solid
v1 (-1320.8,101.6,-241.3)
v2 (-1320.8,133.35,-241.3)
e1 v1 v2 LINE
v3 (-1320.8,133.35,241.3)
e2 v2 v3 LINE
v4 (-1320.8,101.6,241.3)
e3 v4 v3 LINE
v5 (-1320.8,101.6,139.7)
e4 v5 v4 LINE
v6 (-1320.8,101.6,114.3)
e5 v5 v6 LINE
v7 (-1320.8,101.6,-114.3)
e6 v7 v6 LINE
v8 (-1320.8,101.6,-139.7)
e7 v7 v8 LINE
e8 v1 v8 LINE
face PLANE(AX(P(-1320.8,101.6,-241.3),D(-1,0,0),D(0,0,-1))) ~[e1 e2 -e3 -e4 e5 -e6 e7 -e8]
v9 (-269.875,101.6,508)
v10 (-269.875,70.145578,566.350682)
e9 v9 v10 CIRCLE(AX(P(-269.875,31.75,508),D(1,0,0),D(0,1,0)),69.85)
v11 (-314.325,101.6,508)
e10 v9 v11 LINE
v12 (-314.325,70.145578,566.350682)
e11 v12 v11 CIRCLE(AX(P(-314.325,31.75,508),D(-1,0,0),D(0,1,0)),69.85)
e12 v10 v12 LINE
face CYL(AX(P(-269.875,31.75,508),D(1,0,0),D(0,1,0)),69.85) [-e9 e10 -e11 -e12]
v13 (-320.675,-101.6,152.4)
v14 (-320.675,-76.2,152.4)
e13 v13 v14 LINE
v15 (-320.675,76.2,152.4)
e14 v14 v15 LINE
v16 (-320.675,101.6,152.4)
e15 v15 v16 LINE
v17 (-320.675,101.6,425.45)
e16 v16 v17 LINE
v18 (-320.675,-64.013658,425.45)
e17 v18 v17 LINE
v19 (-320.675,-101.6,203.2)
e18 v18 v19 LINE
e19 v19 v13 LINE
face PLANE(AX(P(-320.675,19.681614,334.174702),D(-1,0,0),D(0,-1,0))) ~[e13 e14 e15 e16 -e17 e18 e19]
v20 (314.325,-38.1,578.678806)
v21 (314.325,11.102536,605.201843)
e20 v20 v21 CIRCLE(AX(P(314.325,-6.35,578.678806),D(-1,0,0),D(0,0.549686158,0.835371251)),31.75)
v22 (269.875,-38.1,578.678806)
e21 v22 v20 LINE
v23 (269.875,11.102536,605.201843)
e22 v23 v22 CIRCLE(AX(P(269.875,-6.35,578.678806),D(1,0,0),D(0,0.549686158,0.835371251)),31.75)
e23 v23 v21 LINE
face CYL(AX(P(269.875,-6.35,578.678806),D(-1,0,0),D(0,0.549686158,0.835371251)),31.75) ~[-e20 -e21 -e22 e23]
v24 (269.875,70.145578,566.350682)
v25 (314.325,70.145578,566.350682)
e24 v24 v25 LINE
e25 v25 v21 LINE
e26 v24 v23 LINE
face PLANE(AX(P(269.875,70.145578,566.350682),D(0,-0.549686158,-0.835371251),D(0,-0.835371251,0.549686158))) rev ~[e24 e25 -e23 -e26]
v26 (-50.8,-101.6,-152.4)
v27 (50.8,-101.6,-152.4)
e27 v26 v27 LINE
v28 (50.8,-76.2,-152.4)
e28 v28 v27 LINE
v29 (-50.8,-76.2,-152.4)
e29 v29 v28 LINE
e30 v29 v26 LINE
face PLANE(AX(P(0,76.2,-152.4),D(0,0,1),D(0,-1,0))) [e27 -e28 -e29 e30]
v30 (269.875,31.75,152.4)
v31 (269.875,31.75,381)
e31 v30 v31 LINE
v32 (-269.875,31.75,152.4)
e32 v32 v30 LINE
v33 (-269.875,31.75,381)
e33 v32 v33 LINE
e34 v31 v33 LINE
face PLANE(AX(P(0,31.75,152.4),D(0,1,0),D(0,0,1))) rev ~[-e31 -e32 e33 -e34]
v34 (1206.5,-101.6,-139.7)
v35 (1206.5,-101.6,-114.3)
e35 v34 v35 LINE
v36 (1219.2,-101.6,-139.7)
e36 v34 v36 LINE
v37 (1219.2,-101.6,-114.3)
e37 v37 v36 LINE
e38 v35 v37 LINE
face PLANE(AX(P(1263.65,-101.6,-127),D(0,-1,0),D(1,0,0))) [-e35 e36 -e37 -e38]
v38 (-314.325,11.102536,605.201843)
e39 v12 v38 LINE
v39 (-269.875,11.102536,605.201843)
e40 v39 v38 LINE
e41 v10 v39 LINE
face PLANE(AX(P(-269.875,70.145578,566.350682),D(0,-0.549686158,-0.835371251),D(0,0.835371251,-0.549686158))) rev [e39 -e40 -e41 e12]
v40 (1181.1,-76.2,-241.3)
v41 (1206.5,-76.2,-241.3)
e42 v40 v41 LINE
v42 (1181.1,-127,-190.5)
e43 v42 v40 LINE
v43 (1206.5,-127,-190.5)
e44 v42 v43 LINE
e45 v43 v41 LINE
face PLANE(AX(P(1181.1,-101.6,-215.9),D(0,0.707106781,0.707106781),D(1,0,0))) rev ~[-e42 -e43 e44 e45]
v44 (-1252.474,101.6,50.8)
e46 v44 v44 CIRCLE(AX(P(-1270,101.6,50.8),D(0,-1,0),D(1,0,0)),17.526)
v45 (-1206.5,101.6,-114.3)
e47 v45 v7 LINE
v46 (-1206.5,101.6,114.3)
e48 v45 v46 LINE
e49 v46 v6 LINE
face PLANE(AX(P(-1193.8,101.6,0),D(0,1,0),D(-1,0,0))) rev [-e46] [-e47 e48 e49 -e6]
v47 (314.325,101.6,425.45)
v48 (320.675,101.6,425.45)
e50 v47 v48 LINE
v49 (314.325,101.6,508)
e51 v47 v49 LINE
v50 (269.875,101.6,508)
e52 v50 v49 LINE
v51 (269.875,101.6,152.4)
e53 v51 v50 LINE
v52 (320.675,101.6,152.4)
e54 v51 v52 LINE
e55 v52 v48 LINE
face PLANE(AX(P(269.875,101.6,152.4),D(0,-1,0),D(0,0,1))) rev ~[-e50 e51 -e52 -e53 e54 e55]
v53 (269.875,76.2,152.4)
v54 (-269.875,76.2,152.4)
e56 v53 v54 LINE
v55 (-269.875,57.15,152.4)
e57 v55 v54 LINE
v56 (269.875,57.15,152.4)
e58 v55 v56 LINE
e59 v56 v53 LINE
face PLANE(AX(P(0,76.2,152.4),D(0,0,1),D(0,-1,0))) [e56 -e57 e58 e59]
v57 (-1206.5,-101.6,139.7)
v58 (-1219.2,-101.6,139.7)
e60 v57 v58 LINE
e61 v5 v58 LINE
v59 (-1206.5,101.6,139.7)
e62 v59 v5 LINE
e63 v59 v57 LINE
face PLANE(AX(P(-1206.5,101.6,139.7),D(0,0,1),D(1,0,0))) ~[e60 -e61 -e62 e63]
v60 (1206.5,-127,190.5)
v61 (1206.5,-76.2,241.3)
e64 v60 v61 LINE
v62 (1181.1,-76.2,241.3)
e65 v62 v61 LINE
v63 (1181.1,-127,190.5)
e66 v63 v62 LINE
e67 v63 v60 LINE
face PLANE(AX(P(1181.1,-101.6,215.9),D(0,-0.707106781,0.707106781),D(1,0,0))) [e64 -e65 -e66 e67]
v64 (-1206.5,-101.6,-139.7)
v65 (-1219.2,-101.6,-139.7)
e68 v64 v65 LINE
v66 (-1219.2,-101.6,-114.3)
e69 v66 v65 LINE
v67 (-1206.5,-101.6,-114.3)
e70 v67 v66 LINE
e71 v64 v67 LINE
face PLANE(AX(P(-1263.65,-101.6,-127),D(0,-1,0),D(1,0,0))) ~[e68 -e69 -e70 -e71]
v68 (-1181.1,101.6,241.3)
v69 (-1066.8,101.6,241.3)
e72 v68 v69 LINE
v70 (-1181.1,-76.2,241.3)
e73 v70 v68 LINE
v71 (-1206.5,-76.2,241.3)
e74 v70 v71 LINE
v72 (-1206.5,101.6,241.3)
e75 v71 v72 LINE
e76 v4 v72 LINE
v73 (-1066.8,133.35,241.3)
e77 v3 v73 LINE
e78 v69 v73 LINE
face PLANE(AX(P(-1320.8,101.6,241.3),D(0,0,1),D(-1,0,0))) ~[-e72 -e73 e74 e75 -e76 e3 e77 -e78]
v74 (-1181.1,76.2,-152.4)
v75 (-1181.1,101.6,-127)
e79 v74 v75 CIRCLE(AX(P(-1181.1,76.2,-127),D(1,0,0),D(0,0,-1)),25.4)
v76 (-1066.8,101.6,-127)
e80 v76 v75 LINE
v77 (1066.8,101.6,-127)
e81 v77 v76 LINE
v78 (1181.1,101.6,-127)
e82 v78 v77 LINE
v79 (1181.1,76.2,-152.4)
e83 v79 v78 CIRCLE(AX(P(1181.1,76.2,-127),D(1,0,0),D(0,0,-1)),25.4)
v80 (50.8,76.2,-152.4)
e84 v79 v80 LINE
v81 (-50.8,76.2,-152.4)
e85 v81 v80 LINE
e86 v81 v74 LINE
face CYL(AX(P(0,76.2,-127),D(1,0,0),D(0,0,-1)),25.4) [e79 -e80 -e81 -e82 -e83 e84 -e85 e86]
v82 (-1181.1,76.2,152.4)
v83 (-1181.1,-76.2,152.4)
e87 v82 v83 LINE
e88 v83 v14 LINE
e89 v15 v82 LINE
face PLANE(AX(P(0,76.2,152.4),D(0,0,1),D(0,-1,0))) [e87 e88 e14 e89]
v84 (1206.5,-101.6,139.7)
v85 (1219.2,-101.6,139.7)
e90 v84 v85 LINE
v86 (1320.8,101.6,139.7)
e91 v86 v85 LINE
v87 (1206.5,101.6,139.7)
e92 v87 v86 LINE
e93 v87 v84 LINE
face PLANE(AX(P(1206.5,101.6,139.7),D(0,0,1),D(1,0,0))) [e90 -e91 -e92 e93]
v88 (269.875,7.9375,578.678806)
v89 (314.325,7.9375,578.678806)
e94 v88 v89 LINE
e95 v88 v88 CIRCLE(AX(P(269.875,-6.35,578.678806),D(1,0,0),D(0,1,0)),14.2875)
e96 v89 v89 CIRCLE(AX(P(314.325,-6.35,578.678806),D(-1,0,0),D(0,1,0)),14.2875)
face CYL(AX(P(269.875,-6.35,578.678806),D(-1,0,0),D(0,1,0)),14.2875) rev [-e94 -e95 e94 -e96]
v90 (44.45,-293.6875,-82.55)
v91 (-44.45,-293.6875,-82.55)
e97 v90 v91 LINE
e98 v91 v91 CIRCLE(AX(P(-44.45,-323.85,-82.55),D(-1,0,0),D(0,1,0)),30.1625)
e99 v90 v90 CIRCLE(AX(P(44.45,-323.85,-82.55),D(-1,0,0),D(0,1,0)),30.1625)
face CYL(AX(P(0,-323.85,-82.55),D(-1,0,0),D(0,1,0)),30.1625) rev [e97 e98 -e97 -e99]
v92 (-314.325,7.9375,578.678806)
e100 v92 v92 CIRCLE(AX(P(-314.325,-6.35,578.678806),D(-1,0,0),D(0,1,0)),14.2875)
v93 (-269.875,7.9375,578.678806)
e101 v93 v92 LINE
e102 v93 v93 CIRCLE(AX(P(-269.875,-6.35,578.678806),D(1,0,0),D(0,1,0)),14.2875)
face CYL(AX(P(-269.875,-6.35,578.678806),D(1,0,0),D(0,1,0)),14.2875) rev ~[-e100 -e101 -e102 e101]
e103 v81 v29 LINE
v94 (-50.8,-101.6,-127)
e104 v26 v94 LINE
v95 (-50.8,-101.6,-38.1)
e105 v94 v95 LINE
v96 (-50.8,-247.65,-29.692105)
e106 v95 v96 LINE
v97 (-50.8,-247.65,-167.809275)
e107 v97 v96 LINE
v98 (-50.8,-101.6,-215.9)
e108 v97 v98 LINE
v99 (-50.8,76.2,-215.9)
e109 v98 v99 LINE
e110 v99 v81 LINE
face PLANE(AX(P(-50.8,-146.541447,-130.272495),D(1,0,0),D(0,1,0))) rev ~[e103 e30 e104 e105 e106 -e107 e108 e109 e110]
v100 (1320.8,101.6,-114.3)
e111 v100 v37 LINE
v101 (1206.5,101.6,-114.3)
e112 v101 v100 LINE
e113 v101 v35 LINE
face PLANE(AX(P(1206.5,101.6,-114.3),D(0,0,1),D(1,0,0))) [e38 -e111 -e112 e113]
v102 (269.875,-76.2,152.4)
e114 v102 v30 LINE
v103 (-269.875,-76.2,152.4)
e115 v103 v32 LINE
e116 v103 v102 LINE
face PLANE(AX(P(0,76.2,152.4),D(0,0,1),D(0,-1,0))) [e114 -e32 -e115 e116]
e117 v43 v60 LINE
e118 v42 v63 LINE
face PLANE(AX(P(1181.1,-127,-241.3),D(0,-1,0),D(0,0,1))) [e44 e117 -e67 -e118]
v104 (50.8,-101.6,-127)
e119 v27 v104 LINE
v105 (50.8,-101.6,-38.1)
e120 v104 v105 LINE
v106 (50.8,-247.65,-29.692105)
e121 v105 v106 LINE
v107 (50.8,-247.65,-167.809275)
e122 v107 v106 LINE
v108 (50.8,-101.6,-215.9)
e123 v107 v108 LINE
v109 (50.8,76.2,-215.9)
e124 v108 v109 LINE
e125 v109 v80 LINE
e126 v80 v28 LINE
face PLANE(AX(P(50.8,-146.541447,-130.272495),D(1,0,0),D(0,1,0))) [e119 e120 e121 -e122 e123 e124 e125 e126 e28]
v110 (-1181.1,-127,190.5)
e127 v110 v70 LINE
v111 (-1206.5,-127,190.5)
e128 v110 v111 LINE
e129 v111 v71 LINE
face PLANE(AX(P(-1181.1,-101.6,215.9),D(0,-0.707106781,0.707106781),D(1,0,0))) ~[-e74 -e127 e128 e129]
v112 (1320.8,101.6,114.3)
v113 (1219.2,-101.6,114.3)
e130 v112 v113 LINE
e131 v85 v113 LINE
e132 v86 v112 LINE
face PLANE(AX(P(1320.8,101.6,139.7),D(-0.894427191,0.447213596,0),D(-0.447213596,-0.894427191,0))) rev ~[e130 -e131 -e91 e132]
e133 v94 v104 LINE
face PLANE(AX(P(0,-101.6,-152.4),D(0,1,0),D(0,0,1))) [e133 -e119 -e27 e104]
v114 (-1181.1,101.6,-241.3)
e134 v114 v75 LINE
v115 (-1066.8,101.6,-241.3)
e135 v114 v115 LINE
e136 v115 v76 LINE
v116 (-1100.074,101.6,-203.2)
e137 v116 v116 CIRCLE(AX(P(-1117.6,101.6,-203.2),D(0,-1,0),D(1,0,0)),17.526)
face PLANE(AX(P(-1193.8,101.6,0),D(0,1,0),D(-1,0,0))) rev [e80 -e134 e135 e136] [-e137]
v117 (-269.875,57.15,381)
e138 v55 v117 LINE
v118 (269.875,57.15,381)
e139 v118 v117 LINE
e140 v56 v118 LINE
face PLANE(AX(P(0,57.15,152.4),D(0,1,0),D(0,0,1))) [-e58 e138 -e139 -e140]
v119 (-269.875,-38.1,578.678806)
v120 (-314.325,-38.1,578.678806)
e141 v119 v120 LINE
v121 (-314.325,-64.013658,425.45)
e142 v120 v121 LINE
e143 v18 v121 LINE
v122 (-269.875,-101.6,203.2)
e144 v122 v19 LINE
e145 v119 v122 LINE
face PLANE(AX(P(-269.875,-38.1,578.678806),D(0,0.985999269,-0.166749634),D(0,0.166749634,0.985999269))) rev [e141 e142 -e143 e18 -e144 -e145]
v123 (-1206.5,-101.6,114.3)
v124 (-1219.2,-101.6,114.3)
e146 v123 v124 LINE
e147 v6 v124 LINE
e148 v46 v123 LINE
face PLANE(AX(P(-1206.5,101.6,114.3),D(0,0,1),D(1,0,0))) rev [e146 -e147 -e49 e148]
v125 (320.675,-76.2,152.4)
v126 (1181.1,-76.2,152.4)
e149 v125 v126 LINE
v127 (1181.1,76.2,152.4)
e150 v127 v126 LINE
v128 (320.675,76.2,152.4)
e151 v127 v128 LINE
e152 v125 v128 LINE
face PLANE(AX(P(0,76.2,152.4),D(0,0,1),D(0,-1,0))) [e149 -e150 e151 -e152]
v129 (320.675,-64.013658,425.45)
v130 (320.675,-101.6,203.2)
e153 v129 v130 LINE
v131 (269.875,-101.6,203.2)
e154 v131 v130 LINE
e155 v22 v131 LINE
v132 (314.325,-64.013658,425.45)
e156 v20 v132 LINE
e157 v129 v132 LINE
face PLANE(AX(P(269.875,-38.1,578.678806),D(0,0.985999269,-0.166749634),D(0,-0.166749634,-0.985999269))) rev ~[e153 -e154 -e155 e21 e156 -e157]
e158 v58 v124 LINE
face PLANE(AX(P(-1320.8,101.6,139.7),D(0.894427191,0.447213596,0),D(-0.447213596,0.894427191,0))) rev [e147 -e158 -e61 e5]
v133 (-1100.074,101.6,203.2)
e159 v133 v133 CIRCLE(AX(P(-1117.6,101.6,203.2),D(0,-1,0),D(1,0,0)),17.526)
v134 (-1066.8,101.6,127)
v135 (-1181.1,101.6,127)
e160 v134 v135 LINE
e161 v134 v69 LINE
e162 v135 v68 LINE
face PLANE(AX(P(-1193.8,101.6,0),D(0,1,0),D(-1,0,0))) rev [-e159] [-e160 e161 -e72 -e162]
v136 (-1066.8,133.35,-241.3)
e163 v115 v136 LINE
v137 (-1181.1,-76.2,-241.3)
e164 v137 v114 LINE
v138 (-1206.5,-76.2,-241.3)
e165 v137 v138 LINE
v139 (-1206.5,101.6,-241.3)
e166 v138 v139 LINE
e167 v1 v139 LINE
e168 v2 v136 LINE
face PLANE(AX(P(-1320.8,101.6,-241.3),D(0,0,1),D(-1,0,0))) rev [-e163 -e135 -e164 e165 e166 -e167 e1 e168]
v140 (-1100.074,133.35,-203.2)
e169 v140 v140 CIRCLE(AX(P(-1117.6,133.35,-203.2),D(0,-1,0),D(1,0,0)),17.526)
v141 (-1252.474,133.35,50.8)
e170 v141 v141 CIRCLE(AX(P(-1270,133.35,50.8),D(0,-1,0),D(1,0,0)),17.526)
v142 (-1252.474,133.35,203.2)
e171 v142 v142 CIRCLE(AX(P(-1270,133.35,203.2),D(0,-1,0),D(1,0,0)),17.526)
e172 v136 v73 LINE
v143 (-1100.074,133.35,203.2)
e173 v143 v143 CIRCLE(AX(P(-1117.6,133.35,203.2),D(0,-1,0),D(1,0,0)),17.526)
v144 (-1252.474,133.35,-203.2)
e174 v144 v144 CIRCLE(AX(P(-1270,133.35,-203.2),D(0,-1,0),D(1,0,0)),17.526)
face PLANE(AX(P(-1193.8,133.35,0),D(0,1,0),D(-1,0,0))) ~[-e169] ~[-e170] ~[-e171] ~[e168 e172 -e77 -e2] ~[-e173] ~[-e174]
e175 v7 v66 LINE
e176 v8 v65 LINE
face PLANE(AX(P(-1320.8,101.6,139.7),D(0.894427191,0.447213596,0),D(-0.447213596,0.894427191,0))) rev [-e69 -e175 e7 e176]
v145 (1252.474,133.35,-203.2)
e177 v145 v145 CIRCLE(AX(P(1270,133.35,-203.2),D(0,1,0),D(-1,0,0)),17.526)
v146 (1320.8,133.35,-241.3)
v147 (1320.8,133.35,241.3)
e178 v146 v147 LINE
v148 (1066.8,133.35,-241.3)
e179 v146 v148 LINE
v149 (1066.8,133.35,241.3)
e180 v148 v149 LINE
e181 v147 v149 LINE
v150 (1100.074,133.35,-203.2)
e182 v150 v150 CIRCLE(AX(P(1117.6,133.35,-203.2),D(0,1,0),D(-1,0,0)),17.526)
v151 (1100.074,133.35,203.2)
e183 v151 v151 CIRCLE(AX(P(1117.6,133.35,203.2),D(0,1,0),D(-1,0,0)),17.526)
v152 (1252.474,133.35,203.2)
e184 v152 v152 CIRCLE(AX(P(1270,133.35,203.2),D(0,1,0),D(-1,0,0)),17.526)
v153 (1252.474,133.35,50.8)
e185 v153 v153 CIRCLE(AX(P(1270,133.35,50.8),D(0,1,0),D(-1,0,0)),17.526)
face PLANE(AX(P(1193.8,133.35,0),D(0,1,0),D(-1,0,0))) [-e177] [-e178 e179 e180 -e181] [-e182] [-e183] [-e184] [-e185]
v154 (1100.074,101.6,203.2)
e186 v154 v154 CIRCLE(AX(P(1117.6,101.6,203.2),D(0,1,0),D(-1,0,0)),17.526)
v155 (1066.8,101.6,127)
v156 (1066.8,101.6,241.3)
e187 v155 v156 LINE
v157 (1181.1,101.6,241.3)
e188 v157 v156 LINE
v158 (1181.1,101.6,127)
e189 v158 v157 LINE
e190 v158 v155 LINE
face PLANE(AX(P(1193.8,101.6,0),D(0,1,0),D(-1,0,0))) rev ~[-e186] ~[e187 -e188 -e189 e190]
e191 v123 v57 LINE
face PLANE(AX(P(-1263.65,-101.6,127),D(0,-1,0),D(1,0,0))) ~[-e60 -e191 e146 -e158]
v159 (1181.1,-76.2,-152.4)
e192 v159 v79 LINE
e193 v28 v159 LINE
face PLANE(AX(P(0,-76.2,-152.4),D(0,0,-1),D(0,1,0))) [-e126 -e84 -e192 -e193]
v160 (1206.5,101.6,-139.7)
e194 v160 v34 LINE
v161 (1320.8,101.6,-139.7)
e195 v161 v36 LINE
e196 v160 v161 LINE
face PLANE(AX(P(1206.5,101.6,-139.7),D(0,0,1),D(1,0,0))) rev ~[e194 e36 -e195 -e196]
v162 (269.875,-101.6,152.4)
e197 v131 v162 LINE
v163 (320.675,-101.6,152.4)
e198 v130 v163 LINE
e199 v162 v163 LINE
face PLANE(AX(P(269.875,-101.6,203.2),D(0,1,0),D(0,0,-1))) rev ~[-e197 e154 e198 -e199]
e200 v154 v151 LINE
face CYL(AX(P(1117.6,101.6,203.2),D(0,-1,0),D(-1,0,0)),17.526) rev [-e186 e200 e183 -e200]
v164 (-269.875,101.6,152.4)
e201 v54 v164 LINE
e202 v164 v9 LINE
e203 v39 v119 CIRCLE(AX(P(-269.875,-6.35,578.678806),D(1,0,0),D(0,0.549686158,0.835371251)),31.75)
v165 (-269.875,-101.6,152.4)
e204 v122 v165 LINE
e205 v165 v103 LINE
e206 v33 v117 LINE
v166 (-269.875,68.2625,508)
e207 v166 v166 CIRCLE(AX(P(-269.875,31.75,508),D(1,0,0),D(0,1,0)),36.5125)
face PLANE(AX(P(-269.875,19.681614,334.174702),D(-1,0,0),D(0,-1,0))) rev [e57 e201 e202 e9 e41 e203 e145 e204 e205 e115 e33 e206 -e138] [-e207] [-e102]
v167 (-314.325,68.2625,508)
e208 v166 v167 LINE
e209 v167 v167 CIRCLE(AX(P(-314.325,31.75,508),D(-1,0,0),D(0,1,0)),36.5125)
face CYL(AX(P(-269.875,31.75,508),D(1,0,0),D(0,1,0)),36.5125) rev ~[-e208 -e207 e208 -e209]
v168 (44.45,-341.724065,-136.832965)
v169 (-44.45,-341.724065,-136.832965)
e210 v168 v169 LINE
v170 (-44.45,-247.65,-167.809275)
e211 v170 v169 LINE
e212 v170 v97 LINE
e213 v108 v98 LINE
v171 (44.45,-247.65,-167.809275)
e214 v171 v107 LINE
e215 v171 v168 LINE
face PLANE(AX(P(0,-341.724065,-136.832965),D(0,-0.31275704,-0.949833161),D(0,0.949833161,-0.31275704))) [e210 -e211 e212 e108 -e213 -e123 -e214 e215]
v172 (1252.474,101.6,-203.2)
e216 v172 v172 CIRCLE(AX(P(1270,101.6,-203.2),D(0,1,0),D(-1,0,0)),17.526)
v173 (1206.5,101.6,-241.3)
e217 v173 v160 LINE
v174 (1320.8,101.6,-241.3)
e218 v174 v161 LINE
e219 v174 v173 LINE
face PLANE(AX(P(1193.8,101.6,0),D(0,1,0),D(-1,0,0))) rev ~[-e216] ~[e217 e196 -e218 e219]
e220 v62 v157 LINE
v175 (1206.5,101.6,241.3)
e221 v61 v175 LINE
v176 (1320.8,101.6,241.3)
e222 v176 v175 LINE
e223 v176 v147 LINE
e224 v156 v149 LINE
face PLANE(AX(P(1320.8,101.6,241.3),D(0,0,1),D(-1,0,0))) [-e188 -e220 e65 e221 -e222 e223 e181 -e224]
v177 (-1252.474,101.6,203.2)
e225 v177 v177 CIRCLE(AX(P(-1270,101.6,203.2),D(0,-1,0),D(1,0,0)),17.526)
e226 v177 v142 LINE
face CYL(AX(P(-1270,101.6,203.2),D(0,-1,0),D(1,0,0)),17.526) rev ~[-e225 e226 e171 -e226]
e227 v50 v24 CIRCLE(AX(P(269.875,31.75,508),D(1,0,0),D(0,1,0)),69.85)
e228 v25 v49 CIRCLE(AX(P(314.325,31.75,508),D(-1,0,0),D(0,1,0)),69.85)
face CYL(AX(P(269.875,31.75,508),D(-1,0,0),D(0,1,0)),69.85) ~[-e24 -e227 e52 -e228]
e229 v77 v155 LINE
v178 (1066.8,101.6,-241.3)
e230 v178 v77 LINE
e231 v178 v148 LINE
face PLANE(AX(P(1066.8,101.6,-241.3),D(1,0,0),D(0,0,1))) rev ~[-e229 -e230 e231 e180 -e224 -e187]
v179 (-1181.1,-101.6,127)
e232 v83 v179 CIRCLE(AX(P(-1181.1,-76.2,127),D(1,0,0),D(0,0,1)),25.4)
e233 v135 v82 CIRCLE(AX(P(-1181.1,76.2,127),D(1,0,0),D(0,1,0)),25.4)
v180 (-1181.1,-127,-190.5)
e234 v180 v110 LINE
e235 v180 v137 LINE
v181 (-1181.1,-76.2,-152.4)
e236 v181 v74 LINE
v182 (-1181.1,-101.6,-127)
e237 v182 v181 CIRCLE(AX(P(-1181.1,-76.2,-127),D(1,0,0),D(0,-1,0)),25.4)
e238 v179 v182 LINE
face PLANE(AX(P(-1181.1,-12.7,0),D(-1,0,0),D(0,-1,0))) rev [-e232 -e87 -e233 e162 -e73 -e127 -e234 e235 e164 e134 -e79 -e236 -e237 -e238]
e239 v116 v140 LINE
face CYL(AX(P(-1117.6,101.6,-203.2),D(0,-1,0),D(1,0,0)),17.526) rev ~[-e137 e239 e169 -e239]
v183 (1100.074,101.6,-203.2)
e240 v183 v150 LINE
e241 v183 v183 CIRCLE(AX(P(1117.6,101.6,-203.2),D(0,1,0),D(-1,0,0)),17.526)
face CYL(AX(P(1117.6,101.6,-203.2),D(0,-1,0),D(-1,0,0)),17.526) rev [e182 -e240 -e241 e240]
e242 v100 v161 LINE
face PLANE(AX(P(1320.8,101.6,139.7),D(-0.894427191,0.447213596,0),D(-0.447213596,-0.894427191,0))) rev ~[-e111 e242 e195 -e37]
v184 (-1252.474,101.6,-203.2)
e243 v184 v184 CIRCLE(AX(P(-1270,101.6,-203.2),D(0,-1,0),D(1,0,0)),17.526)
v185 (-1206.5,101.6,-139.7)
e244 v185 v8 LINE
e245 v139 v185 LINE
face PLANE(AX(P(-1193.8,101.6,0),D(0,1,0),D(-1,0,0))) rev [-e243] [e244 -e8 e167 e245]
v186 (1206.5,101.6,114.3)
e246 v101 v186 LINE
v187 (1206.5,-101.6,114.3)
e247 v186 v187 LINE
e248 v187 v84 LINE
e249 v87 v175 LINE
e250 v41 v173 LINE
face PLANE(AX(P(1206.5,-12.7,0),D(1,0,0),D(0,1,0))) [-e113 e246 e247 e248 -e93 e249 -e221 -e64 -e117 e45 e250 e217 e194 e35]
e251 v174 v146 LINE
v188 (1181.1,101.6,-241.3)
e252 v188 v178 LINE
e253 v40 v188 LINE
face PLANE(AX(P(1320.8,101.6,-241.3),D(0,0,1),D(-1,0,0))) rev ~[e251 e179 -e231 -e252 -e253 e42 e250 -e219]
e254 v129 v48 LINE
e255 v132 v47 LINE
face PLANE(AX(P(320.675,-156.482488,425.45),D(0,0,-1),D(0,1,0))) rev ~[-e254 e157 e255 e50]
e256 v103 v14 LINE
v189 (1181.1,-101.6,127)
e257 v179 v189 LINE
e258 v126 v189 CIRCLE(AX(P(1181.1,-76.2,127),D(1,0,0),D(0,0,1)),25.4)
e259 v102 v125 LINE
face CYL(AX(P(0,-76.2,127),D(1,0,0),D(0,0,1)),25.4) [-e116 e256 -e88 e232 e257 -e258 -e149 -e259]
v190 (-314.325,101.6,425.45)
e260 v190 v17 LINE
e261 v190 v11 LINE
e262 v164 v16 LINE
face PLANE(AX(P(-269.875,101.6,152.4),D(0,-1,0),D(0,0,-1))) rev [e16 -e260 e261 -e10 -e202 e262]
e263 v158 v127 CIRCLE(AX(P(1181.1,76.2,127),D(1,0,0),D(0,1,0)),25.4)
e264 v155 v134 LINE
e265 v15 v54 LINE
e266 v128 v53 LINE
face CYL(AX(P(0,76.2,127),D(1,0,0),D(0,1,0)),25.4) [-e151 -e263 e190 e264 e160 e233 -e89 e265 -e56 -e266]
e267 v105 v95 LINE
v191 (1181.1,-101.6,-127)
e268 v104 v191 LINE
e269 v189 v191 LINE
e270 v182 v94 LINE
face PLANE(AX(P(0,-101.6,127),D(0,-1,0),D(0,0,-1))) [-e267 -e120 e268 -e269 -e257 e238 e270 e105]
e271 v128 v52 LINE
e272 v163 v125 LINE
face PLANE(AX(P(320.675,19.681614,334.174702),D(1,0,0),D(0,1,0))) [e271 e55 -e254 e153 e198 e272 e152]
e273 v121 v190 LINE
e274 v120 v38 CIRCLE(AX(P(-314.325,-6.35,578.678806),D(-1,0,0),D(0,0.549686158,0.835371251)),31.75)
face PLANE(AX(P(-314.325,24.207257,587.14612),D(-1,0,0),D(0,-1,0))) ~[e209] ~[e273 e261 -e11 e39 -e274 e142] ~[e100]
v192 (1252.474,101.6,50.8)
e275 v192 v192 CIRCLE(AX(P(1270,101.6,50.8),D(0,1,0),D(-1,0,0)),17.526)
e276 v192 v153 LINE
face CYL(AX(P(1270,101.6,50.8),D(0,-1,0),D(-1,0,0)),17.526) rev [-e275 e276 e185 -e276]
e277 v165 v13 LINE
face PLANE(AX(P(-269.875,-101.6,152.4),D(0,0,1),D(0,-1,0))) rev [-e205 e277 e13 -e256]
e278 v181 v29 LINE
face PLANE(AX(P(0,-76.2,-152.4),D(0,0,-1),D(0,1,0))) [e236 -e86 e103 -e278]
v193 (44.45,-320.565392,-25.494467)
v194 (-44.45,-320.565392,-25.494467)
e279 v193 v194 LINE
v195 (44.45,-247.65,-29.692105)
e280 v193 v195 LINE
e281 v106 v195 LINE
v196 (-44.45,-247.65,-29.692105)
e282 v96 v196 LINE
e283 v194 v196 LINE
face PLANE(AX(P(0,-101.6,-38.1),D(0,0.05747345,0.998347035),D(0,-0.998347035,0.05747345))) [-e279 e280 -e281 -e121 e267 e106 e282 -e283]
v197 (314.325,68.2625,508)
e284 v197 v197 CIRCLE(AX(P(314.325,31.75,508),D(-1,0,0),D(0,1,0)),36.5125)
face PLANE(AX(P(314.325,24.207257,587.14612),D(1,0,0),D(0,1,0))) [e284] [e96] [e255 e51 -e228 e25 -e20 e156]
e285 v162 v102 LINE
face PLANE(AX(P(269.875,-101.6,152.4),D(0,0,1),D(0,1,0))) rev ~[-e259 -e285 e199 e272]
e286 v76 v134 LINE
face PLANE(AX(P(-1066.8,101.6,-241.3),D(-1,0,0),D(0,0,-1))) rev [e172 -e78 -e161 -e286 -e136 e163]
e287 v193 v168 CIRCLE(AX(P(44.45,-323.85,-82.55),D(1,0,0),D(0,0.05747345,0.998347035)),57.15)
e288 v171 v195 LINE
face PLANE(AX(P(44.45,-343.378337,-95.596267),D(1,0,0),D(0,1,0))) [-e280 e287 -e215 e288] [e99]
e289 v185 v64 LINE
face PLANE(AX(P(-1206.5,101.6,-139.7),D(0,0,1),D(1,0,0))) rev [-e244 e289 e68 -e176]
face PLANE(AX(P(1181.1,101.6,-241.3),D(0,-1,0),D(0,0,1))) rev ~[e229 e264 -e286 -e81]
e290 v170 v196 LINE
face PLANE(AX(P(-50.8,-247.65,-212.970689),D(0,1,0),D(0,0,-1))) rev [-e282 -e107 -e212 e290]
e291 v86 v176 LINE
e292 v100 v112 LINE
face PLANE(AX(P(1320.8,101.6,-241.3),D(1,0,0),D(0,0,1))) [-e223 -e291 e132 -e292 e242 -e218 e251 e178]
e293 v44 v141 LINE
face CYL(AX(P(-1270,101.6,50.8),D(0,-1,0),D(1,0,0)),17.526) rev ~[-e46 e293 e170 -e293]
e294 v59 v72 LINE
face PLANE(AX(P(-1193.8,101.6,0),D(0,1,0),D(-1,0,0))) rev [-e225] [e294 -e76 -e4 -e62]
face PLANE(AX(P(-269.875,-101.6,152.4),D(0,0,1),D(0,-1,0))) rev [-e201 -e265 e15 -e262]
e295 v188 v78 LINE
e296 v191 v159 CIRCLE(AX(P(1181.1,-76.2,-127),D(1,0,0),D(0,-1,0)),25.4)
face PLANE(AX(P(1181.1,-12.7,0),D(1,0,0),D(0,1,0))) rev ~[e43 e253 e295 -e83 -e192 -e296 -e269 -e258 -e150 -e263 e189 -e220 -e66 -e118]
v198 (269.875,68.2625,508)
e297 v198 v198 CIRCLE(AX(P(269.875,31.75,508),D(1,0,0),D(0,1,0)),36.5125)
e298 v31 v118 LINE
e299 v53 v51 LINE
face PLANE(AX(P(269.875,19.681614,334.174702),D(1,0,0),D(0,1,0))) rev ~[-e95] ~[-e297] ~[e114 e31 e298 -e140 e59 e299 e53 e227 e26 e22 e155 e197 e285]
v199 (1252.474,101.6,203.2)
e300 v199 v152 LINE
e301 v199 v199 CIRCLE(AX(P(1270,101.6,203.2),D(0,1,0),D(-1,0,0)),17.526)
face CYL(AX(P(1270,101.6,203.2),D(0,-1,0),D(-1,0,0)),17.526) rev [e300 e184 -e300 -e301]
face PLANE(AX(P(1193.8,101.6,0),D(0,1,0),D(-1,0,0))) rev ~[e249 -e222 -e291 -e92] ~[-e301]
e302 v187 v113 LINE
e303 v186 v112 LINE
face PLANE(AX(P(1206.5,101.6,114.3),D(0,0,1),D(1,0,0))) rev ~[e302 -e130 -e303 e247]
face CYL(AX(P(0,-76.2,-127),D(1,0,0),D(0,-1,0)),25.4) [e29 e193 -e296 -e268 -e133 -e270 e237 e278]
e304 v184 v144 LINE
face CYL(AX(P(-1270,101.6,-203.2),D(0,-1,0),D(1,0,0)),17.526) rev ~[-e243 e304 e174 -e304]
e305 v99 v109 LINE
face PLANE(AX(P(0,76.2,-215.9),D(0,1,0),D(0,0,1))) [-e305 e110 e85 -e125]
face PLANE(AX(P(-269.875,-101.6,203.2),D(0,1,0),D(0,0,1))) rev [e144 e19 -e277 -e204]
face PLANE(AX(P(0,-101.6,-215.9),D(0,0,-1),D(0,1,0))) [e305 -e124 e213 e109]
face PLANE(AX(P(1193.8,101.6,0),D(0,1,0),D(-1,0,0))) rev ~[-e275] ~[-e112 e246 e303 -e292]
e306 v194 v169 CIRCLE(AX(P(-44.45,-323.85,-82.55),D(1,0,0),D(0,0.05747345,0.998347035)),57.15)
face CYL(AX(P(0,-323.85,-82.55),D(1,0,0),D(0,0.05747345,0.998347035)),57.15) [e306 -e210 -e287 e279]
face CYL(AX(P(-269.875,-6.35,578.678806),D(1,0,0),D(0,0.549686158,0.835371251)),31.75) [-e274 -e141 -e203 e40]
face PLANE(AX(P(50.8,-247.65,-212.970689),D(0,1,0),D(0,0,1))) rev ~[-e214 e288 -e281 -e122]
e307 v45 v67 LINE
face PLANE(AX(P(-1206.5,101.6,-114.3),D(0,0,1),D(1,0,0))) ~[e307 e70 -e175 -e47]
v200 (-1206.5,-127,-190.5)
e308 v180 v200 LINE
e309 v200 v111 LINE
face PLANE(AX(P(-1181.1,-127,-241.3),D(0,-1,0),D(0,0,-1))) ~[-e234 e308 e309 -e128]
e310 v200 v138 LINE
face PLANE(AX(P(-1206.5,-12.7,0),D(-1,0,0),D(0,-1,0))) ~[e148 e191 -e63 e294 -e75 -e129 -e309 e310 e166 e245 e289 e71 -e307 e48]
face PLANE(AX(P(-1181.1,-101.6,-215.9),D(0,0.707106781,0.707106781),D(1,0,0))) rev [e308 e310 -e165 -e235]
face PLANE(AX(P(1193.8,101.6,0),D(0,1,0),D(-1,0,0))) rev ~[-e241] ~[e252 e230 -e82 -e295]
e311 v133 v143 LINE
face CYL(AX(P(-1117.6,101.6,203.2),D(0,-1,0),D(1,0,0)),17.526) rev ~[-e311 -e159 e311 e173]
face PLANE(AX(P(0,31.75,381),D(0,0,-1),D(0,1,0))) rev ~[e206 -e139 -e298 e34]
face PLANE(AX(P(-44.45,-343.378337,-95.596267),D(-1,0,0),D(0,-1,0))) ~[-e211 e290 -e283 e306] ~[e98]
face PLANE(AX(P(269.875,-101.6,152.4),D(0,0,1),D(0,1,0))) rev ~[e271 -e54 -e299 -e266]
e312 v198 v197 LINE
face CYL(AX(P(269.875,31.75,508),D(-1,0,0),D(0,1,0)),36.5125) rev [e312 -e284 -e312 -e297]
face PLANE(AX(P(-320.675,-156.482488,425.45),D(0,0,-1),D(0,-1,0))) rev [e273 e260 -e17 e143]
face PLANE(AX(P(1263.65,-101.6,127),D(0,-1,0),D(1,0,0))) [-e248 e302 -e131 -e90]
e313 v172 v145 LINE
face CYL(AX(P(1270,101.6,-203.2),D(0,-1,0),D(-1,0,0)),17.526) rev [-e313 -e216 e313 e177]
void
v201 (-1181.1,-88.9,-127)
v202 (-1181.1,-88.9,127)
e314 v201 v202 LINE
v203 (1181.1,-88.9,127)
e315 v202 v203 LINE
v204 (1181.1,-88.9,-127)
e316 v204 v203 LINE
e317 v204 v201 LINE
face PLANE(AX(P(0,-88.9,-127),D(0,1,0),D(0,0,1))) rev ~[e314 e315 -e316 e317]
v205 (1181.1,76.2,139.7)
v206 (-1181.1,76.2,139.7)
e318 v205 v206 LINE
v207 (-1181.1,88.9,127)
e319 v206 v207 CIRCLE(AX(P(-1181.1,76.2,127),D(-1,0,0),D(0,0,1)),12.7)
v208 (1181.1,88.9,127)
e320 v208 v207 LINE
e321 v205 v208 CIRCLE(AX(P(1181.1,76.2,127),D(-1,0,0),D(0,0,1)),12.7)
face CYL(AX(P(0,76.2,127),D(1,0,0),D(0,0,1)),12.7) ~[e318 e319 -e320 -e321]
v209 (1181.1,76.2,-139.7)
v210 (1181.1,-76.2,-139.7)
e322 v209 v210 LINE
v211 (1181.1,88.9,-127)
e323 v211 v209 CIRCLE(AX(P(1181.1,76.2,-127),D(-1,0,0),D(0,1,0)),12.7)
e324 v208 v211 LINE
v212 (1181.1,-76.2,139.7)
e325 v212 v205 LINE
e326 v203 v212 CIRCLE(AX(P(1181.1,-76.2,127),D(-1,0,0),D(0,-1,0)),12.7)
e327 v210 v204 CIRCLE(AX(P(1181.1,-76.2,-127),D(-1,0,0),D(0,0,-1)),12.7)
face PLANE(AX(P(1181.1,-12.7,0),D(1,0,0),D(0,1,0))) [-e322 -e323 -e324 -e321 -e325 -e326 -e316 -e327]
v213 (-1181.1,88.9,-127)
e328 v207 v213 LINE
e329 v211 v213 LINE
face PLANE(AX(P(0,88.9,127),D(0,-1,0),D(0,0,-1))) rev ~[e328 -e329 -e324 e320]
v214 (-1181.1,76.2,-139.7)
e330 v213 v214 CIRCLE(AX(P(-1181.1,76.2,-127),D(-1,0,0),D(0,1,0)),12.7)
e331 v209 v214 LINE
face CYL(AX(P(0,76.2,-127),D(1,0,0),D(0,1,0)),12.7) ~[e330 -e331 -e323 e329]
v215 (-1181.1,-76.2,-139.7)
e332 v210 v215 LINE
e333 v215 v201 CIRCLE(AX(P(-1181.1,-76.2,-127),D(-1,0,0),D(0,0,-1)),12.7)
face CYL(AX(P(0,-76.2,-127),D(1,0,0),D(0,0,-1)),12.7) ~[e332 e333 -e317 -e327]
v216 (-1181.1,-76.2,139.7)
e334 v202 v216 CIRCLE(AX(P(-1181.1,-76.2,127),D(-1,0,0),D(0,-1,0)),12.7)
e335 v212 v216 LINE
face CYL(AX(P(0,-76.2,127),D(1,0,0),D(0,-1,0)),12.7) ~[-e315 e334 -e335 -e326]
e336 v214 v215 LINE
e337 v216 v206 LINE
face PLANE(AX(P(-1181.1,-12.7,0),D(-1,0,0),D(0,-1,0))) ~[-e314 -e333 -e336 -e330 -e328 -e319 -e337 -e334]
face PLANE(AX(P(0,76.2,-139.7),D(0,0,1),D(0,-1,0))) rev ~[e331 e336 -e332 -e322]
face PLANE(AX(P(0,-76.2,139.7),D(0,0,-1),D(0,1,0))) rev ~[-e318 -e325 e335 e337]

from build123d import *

# Parameters (mm, degrees)
F1_DEPTH  = 1181.1
F2_W      = 228.6
F2_H      = 482.6
F3_DEPTH  = 25.4
F4_SIZE   = 50.8
F5_W      = 254
F5_H      = 482.6
F5_R      = 17.526
F6_DEPTH  = 31.75
F7_W      = 114.3
F7_H      = 25.4
F8_DEPTH  = 203.2
F10_DEPTH = 381.001
F13_W     = 25.4
F13_H     = 228.6
F14_DEPTH = 269.875
F15_R     = 14.2875
F15_R_2   = 36.5125
F15_W     = 25.4
F15_H     = 228.6
F16_DEPTH = 50.8
F17_W     = 361.3794893026
F17_H     = 323.3922393799
F18_DEPTH = 6.35
F20_R     = 30.1625
F21_DEPTH = 50.8
F23_DEPTH = 6.35


with BuildPart() as f1:
    # F0 (on Right) → F1 (new body, symmetric)
    with BuildSketch(Plane.YZ):
        with BuildLine():
            Line((76.2, 152.4), (-76.2, 152.4))
            ThreePointArc((-76.2, 152.4), (-94.1605122421, 144.9605122421), (-101.6, 127))
            Line((-101.6, 127), (-101.6, -127))
            ThreePointArc((-101.6, -127), (-94.1605122421, -144.9605122421), (-76.2, -152.4))
            Line((-76.2, -152.4), (76.2, -152.4))
            ThreePointArc((76.2, -152.4), (94.1605122421, -144.9605122421), (101.6, -127))
            Line((101.6, -127), (101.6, 127))
            ThreePointArc((101.6, 127), (94.1605122421, 144.9605122421), (76.2, 152.4))
        make_face()
        with BuildLine():
            ThreePointArc((-88.9, 127), (-85.1802561211, 135.9802561211), (-76.2, 139.7))
            Line((-76.2, 139.7), (76.2, 139.7))
            ThreePointArc((76.2, 139.7), (85.1802561211, 135.9802561211), (88.9, 127))
            Line((88.9, 127), (88.9, -127))
            ThreePointArc((88.9, -127), (85.1802561211, -135.9802561211), (76.2, -139.7))
            Line((76.2, -139.7), (-76.2, -139.7))
            ThreePointArc((-76.2, -139.7), (-85.1802561211, -135.9802561211), (-88.9, -127))
            Line((-88.9, -127), (-88.9, 127))
        make_face(mode=Mode.SUBTRACT)
    extrude(amount=F1_DEPTH, both=True)

    # F2 (on face) → F3 (join)
    with BuildSketch(Plane.YZ.offset(1181.1)):
        with Locations((-12.7, 0)):
            Rectangle(F2_W, F2_H)
    extrude(amount=F3_DEPTH)

    # F4
    f4_edges = [f1.edges().sort_by_distance(p)[0] for p in [
        (1193.8, -127, 241.3),
        (1193.8, -127, -241.3),
    ]]
    chamfer(f4_edges, length=F4_SIZE)

    # F5 (on face) → F6 (join)
    with BuildSketch(Plane(origin=(0, 101.6, 0), x_dir=(-1, 0, 0), z_dir=(0, 1, 0))):
        with Locations((-1193.8, 0)):
            Rectangle(F5_W, F5_H)
        with Locations((-1270, -203.2)):
            Circle(F5_R, mode=Mode.SUBTRACT)
        with Locations((-1117.6, -203.2)):
            Circle(F5_R, mode=Mode.SUBTRACT)
        with Locations((-1270, 50.8)):
            Circle(F5_R, mode=Mode.SUBTRACT)
        with Locations((-1270, 203.2)):
            Circle(F5_R, mode=Mode.SUBTRACT)
        with Locations((-1117.6, 203.2)):
            Circle(F5_R, mode=Mode.SUBTRACT)
    extrude(amount=F6_DEPTH)

    # F7 (on face) → F8 (join)
    with BuildSketch(Plane.XZ.offset(-101.6)):
        with Locations((1263.65, 127)):
            Rectangle(F7_W, F7_H)
        with Locations((1263.65, -127)):
            Rectangle(F7_W, F7_H)
    extrude(amount=F8_DEPTH)

    # F9 (on face) → F10 (cut, through all)
    with BuildSketch(Plane.XY.offset(139.7)):
        Polygon((1219.2, -101.6), (1320.8, -101.6), (1320.8, 101.6), align=None)
    extrude(amount=-F10_DEPTH, mode=Mode.SUBTRACT)


with BuildPart() as f11_1:
    # F11: instance of F1
    add(f1.part.mirror(Plane.YZ))


with BuildPart() as f1_1:
    add(f1.part)

    # F12: union F11_1
    add(f11_1.part)

    # F13 (on Right) → F14 (join, symmetric)
    with BuildSketch(Plane.YZ):
        with Locations((44.45, 266.7)):
            Rectangle(F13_W, F13_H)
    extrude(amount=F14_DEPTH, both=True)

    # F15 (on face) → F16 (join)
    with BuildSketch(Plane.YZ.offset(269.875)):
        with BuildLine():
            Line((57.15, 152.4), (101.6, 152.4))
            Line((101.6, 152.4), (101.6, 508))
            ThreePointArc((101.6, 508), (93.2355821831, 541.1443160075), (70.1455781359, 566.3506819121))
            Line((70.1455781359, 566.3506819121), (11.1025355163, 605.2018432352))
            ThreePointArc((11.1025355163, 605.2018432352), (-21.4155981852, 606.6267979039), (-38.1, 578.6788060024))
            Line((-38.1, 578.6788060024), (-101.6, 203.2))
            Line((-101.6, 203.2), (-101.6, 152.4))
            Line((-101.6, 152.4), (31.75, 152.4))
            Line((31.75, 152.4), (31.75, 381))
            Line((31.75, 381), (57.15, 381))
            Line((57.15, 381), (57.15, 152.4))
        make_face()
        with Locations((-6.35, 578.6788060024)):
            Circle(F15_R, mode=Mode.SUBTRACT)
        with Locations((31.75, 508)):
            Circle(F15_R_2, mode=Mode.SUBTRACT)
        with Locations((44.45, 266.7)):
            Rectangle(F15_W, F15_H)
    extrude(amount=F16_DEPTH)

    # F17 (on face) → F18 (cut)
    with BuildSketch(Plane.YZ.offset(320.675)):
        with Locations((24.2072567344, 587.1461196899)):
            Rectangle(F17_W, F17_H)
    extrude(amount=-F18_DEPTH, mode=Mode.SUBTRACT)


with BuildPart() as f19_1:
    # F19: instance of F1
    add(f1_1.part.mirror(Plane.YZ))


with BuildPart() as f1_2:
    add(f1_1.part)

    add(f19_1.part)  # F21 merges F19_1
    # F20 (on Right) → F21 (join, symmetric)
    with BuildSketch(Plane.YZ):
        with BuildLine():
            Line((-101.6, -215.9), (76.2, -215.9))
            Line((76.2, -215.9), (76.2, -152.4))
            Line((76.2, -152.4), (-101.6, -152.4))
            Line((-101.6, -152.4), (-101.6, -139.7))
            Line((-101.6, -139.7), (-101.6, -127))
            Line((-101.6, -127), (-101.6, -38.1))
            Line((-101.6, -38.1), (-320.5653923257, -25.4944669429))
            ThreePointArc((-320.5653923257, -25.4944669429), (-379.9951543899, -71.8802231262), (-341.724064813, -136.8329651646))
            Line((-341.724064813, -136.8329651646), (-101.6, -215.9))
        make_face()
        with Locations((-323.85, -82.55)):
            Circle(F20_R, mode=Mode.SUBTRACT)
    extrude(amount=F21_DEPTH, both=True)


with BuildPart() as f23:
    # F22 (on face) → F23 (new body)
    with BuildSketch(Plane.YZ.offset(50.8)):
        Polygon((-247.65, -212.9706889391), (-247.65, -82.55), (-247.65, 21.7781551182), (-439.1066730022, 21.7781551182), (-439.1066730022, -212.9706889391), align=None)
    extrude(amount=-F23_DEPTH)


with BuildPart() as f24_1:
    # F24: instance of F23
    add(f23.part.mirror(Plane.YZ))


with BuildPart() as f1_3:
    add(f1_2.part)

    # F25: cut F24_1, F23
    add(f24_1.part, mode=Mode.SUBTRACT)
    add(f23.part, mode=Mode.SUBTRACT)


solid = f1_3.part
